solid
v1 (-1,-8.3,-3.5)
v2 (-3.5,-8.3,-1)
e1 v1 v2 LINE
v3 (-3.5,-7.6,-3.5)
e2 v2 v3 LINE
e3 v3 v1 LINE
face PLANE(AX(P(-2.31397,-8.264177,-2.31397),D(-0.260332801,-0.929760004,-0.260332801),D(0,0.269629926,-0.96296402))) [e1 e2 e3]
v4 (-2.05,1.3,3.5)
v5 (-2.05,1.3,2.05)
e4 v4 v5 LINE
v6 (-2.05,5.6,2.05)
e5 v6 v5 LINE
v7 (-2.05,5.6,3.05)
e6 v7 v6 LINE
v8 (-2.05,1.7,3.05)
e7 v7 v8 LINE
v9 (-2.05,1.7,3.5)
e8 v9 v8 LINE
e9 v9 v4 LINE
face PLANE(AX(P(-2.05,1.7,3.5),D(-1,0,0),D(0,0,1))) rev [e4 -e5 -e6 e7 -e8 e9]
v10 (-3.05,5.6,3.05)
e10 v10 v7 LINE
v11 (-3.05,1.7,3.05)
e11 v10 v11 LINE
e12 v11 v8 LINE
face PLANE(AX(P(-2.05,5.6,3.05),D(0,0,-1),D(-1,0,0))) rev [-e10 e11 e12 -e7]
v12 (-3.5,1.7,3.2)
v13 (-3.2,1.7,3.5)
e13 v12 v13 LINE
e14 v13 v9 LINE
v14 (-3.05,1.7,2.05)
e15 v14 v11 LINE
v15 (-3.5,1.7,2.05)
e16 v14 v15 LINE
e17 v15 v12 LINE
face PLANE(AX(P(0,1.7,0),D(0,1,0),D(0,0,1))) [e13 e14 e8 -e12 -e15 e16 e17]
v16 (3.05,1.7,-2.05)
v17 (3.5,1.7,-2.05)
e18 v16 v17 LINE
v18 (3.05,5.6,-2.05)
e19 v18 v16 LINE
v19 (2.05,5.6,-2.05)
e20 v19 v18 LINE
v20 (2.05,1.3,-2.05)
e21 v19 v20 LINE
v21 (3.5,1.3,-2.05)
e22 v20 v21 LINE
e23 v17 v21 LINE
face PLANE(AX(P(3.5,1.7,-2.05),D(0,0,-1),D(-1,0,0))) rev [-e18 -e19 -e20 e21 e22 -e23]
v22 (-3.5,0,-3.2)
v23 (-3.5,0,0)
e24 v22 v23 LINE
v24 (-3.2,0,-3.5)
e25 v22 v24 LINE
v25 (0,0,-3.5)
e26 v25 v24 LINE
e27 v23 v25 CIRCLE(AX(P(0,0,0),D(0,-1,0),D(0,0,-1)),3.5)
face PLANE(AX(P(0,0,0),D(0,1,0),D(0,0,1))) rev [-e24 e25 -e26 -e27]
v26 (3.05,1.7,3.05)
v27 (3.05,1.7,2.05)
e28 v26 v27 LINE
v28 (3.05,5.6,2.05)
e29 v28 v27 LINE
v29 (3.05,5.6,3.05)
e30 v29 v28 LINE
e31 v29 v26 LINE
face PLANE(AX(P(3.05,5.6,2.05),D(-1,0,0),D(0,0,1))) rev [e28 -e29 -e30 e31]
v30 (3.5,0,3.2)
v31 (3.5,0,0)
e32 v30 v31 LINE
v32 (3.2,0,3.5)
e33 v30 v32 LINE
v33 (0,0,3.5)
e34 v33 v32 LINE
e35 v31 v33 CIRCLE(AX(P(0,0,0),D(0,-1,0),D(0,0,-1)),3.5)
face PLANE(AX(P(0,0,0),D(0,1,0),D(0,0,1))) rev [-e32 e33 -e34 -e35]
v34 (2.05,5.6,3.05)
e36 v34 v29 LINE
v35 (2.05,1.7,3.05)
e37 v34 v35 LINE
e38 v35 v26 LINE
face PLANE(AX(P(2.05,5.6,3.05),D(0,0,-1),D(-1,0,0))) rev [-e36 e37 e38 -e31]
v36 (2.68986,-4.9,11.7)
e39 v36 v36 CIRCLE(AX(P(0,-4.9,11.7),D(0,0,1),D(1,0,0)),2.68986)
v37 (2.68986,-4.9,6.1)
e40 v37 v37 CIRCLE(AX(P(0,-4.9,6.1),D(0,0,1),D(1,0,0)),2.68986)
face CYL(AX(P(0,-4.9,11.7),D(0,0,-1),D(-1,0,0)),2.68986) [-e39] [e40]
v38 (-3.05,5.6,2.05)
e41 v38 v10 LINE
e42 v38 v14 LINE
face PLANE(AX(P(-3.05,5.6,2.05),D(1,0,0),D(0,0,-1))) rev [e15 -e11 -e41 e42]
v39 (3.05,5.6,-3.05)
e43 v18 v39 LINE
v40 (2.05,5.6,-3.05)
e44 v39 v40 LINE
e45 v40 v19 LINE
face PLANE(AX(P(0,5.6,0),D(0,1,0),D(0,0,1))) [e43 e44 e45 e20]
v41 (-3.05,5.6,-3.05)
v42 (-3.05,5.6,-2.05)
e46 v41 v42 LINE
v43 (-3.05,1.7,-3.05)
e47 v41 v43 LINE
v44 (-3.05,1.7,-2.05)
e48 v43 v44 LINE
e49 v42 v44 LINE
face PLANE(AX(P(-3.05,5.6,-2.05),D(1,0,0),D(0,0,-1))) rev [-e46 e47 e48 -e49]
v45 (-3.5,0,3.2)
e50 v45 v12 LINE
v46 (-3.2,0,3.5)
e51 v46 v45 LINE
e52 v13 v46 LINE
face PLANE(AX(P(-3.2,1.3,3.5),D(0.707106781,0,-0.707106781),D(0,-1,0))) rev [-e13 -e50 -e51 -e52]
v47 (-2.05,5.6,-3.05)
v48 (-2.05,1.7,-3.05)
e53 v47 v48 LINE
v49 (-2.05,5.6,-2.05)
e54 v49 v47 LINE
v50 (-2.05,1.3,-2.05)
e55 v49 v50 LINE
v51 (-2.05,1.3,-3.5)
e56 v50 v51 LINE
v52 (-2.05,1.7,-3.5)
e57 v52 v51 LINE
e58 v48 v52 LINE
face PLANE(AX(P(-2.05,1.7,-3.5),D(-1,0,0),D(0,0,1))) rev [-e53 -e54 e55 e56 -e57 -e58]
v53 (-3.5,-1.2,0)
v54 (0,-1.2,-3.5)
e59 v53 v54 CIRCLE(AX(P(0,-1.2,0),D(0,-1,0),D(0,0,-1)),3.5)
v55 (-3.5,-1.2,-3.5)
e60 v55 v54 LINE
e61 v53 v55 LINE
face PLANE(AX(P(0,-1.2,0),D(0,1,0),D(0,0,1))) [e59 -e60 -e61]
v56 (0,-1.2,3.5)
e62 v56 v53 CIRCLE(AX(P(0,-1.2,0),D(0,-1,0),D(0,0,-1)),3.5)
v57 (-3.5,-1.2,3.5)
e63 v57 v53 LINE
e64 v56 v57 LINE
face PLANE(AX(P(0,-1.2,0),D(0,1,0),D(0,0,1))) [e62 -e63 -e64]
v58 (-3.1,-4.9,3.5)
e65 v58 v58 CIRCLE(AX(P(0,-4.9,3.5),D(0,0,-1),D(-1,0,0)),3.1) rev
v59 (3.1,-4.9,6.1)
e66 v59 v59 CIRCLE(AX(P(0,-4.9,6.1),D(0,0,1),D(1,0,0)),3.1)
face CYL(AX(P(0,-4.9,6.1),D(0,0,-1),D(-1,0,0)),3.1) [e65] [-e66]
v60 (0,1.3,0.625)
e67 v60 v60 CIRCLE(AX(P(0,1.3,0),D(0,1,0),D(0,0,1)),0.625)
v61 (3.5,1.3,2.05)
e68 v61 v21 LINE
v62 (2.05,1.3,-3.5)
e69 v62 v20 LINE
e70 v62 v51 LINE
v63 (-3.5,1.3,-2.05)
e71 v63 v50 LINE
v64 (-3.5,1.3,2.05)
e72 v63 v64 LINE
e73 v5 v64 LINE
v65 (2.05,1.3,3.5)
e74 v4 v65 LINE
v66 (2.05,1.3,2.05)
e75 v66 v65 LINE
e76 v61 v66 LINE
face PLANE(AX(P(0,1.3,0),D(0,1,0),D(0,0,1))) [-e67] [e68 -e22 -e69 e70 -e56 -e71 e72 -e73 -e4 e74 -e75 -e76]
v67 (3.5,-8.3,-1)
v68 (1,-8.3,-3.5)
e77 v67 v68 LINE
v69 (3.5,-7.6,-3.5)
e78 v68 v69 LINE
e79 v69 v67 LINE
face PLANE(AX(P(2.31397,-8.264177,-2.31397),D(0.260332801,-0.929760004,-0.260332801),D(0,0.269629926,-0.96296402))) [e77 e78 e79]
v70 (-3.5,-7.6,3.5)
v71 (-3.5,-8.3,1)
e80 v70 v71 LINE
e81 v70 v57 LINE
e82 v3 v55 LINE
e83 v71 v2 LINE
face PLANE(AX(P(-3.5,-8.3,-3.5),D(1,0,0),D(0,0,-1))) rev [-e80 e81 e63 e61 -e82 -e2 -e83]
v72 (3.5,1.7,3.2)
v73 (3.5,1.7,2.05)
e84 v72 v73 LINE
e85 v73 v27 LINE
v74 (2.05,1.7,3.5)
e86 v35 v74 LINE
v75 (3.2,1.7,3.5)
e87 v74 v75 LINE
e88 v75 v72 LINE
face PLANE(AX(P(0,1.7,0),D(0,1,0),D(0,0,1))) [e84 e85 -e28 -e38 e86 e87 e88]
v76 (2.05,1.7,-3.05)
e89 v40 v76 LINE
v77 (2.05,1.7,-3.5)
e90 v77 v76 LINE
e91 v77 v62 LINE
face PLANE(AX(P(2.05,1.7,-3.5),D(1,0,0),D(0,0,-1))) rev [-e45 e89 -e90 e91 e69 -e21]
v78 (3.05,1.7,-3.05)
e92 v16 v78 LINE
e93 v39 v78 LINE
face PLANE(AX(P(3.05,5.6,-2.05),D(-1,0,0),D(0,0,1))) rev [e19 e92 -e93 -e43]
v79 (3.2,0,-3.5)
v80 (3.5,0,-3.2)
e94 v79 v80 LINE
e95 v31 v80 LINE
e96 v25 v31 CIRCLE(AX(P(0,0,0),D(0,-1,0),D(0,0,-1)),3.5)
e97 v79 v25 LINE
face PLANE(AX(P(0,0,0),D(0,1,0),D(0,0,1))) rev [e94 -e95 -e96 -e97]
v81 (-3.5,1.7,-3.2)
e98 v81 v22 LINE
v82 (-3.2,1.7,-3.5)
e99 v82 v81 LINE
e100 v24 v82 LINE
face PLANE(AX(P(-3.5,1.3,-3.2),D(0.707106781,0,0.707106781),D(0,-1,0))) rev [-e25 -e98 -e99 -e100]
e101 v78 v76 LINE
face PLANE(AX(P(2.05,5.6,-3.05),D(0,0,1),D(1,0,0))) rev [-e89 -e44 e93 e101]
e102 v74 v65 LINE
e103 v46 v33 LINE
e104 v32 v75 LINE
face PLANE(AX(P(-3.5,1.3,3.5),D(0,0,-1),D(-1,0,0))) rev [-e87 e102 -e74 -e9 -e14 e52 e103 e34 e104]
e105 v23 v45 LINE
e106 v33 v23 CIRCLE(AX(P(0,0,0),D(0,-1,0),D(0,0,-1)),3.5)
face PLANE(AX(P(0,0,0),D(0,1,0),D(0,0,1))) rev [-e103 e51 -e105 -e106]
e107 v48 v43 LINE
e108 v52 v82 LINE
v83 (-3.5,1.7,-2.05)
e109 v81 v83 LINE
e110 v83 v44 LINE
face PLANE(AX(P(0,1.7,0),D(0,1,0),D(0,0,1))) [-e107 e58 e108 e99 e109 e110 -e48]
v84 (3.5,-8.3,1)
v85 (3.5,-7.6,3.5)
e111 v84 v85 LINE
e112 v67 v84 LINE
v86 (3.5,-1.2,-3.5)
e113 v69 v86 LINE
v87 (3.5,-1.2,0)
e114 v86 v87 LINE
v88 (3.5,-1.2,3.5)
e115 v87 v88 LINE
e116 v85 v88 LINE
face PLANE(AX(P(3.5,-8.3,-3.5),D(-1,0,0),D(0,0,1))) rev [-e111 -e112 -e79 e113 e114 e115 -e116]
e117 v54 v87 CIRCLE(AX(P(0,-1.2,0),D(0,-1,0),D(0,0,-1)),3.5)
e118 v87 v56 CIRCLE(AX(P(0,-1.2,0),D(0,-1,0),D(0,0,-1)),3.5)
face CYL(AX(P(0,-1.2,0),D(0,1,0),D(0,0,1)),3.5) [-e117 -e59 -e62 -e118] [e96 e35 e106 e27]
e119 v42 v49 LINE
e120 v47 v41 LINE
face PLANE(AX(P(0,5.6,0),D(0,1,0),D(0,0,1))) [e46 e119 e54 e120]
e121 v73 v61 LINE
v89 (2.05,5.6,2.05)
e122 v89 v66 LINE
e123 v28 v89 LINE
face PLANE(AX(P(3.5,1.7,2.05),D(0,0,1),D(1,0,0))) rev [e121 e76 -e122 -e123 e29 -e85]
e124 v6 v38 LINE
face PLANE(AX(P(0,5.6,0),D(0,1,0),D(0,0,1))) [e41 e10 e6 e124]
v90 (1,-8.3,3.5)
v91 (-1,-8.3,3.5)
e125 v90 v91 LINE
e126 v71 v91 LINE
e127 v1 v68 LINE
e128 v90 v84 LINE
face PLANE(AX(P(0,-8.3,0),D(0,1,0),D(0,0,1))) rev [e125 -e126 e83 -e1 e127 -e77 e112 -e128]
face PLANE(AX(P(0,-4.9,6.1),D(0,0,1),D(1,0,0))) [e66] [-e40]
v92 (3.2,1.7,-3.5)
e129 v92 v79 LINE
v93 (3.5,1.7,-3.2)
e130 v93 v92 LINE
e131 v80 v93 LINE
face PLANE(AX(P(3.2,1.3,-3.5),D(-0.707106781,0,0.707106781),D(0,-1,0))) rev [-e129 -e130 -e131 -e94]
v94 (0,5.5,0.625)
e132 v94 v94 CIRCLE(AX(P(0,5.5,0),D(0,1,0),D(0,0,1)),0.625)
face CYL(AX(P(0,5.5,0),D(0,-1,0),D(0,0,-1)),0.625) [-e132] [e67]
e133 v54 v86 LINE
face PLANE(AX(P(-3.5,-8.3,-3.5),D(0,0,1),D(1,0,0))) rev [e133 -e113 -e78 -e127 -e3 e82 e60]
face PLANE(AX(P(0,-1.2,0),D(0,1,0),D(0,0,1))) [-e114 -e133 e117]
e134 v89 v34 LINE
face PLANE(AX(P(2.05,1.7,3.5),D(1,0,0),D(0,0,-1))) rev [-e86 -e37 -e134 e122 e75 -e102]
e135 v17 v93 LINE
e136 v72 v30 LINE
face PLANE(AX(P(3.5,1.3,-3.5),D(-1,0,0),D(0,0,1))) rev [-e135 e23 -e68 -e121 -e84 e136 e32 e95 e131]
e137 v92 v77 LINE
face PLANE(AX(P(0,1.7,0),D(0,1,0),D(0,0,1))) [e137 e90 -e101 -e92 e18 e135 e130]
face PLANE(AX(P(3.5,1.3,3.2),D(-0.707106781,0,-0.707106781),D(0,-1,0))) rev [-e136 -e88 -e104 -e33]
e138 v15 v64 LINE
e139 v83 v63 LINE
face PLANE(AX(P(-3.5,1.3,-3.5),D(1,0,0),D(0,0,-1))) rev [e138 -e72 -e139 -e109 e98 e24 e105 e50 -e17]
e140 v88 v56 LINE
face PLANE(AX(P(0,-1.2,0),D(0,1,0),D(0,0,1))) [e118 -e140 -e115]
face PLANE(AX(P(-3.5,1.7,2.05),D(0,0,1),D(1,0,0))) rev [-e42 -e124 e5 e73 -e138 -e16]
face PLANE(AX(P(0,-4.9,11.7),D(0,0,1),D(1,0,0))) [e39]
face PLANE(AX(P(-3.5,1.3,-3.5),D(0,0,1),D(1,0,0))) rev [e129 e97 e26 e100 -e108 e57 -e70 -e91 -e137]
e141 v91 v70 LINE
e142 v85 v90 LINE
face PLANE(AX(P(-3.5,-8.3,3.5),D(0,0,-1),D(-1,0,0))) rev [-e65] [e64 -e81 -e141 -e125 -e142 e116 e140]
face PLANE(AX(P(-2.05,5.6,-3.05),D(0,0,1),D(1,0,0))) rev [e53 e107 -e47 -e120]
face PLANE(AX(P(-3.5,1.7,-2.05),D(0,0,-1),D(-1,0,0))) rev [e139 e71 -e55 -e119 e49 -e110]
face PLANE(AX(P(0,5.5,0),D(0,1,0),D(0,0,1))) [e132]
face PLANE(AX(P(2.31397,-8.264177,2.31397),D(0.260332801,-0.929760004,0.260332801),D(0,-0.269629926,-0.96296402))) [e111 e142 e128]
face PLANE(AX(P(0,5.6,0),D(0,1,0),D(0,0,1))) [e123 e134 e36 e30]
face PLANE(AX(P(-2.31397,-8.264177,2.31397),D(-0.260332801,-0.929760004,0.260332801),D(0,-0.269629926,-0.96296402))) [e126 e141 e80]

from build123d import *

# Parameters (mm, degrees)
SKETCH1_W           = 7
SKETCH1_H           = 7
BOSS_EXTRUDE1_DEPTH = 1.3
SKETCH2_W           = 1.45
SKETCH2_H           = 1.45
BOSS_EXTRUDE2_DEPTH = 0.4
SKETCH3_W           = 1
SKETCH3_H           = 1
BOSS_EXTRUDE3_DEPTH = 3.9
SKETCH4_R           = 0.625
BOSS_EXTRUDE4_DEPTH = 4.2
SKETCH5_R           = 3.5
BOSS_EXTRUDE5_DEPTH = 1.2
SKETCH6_W           = 7
SKETCH6_H           = 7
BOSS_EXTRUDE6_DEPTH = 7.1
CHAMFER1_START      = 8.88850564
CHAMFER1_OUTLINE_W  = 6
CHAMFER1_OUTLINE_H  = 6
CHAMFER1_DEPTH      = 2.11149436
CHAMFER2_START      = -11
CHAMFER2_OUTLINE_W  = 6
CHAMFER2_OUTLINE_H  = 6
CHAMFER2_DEPTH      = 2.11149436
CHAMFER3_START      = 8.88850564
CHAMFER3_OUTLINE_W  = 6
CHAMFER3_OUTLINE_H  = 6
CHAMFER3_DEPTH      = 2.11149436
CHAMFER4_START      = -11
CHAMFER4_OUTLINE_W  = 6
CHAMFER4_OUTLINE_H  = 6
CHAMFER4_DEPTH      = 2.11149436
CHAMFER5_SIZE       = 0.3
SKETCH7_R           = 3.1
BOSS_EXTRUDE7_DEPTH = 2.6
SKETCH8_R           = 2.68986
BOSS_EXTRUDE8_DEPTH = 5.6


with BuildPart() as part:
    # Sketch1 → Boss-Extrude1 (new body)
    with BuildSketch(Plane(origin=(0, 0, 0), x_dir=(1, 0, 0), z_dir=(0, 1, 0))):
        Rectangle(SKETCH1_W, SKETCH1_H)
    extrude(amount=BOSS_EXTRUDE1_DEPTH)

    # Sketch2 → Boss-Extrude2 (add)
    with BuildSketch(Plane(origin=(0, 1.3, 0), x_dir=(1, 0, 0), z_dir=(0, 1, 0))):
        with Locations((-2.775, 2.775)):
            Rectangle(SKETCH2_W, SKETCH2_H)
        with Locations((2.775, 2.775)):
            Rectangle(SKETCH2_W, SKETCH2_H)
        with Locations((2.775, -2.775)):
            Rectangle(SKETCH2_W, SKETCH2_H)
        with Locations((-2.775, -2.775)):
            Rectangle(SKETCH2_W, SKETCH2_H)
    extrude(amount=BOSS_EXTRUDE2_DEPTH)

    # Sketch3 → Boss-Extrude3 (add)
    with BuildSketch(Plane(origin=(0, 1.7, 0), x_dir=(1, 0, 0), z_dir=(0, 1, 0))):
        with Locations((-2.55, 2.55)):
            Rectangle(SKETCH3_W, SKETCH3_H)
        with Locations((-2.55, -2.55)):
            Rectangle(SKETCH3_W, SKETCH3_H)
        with Locations((2.55, -2.55)):
            Rectangle(SKETCH3_W, SKETCH3_H)
        with Locations((2.55, 2.55)):
            Rectangle(SKETCH3_W, SKETCH3_H)
    extrude(amount=BOSS_EXTRUDE3_DEPTH)

    # Sketch4 → Boss-Extrude4 (add)
    with BuildSketch(Plane(origin=(0, 1.3, 0), x_dir=(1, 0, 0), z_dir=(0, 1, 0))):
        with Locations(Location((0, 0, 0), (0, 0, 270))):
            Circle(SKETCH4_R)
    extrude(amount=BOSS_EXTRUDE4_DEPTH)

    # Sketch5 → Boss-Extrude5 (add)
    with BuildSketch(Plane(origin=(0, 0, 0), x_dir=(-1, 0, 0), z_dir=(0, -1, 0))):
        with Locations(Location((0, 0, 0), (0, 0, 90))):
            Circle(SKETCH5_R)
    extrude(amount=BOSS_EXTRUDE5_DEPTH)

    # Sketch6 → Boss-Extrude6 (add)
    with BuildSketch(Plane(origin=(0, -1.2, 0), x_dir=(-1, 0, 0), z_dir=(0, -1, 0))):
        Rectangle(SKETCH6_W, SKETCH6_H)
    extrude(amount=BOSS_EXTRUDE6_DEPTH)

    # Chamfer1: read off the stored shape, not the designer's step
    # Chamfer1 outline → Chamfer1 (cut)
    with BuildSketch(Plane(origin=(0, 0, 0), x_dir=(0.9655189447347837, 0.25069112066556, 0.07019351378635694), z_dir=(0.26033280115696106, -0.9297600041320021, -0.26033280115696106)).offset(CHAMFER1_START)):
        Rectangle(CHAMFER1_OUTLINE_W, CHAMFER1_OUTLINE_H)
    extrude(amount=CHAMFER1_DEPTH, mode=Mode.SUBTRACT)

    # Chamfer2: read off the stored shape, not the designer's step
    # Chamfer2 outline → Chamfer2 (cut)
    with BuildSketch(Plane(origin=(0, 0, 0), x_dir=(0.9655189447347837, -0.25069112066556, -0.07019351378635694), z_dir=(0.26033280115696106, 0.9297600041320021, 0.26033280115696106)).offset(CHAMFER2_START)):
        Rectangle(CHAMFER2_OUTLINE_W, CHAMFER2_OUTLINE_H)
    extrude(amount=CHAMFER2_DEPTH, mode=Mode.SUBTRACT)

    # Chamfer3: read off the stored shape, not the designer's step
    # Chamfer3 outline → Chamfer3 (cut)
    with BuildSketch(Plane(origin=(0, 0, 0), x_dir=(0.9655189447347837, 0.25069112066556, -0.07019351378635694), z_dir=(0.26033280115696106, -0.9297600041320021, 0.26033280115696106)).offset(CHAMFER3_START)):
        Rectangle(CHAMFER3_OUTLINE_W, CHAMFER3_OUTLINE_H)
    extrude(amount=CHAMFER3_DEPTH, mode=Mode.SUBTRACT)

    # Chamfer4: read off the stored shape, not the designer's step
    # Chamfer4 outline → Chamfer4 (cut)
    with BuildSketch(Plane(origin=(0, 0, 0), x_dir=(0.9655189447347837, -0.25069112066556, 0.07019351378635694), z_dir=(0.26033280115696106, 0.9297600041320021, -0.26033280115696106)).offset(CHAMFER4_START)):
        Rectangle(CHAMFER4_OUTLINE_W, CHAMFER4_OUTLINE_H)
    extrude(amount=CHAMFER4_DEPTH, mode=Mode.SUBTRACT)

    # Chamfer5
    chamfer5_edges = [part.edges().sort_by_distance(p)[0] for p in [
        (3.5, 0.85, 3.5),
        (-3.5, 0.85, 3.5),
        (-3.5, 0.85, -3.5),
        (3.5, 0.85, -3.5),
    ]]
    chamfer(chamfer5_edges, length=CHAMFER5_SIZE)

    # Sketch7 → Boss-Extrude7 (add)
    with BuildSketch(Plane.XY.offset(3.5)):
        with Locations(Location((0, -4.9, 0), (0, 0, 180))):
            Circle(SKETCH7_R)
    extrude(amount=BOSS_EXTRUDE7_DEPTH)

    # Sketch8 → Boss-Extrude8 (add)
    with BuildSketch(Plane.XY.offset(6.1)):
        with Locations((0, -4.9)):
            Circle(SKETCH8_R)
    extrude(amount=BOSS_EXTRUDE8_DEPTH)


solid = part.part
